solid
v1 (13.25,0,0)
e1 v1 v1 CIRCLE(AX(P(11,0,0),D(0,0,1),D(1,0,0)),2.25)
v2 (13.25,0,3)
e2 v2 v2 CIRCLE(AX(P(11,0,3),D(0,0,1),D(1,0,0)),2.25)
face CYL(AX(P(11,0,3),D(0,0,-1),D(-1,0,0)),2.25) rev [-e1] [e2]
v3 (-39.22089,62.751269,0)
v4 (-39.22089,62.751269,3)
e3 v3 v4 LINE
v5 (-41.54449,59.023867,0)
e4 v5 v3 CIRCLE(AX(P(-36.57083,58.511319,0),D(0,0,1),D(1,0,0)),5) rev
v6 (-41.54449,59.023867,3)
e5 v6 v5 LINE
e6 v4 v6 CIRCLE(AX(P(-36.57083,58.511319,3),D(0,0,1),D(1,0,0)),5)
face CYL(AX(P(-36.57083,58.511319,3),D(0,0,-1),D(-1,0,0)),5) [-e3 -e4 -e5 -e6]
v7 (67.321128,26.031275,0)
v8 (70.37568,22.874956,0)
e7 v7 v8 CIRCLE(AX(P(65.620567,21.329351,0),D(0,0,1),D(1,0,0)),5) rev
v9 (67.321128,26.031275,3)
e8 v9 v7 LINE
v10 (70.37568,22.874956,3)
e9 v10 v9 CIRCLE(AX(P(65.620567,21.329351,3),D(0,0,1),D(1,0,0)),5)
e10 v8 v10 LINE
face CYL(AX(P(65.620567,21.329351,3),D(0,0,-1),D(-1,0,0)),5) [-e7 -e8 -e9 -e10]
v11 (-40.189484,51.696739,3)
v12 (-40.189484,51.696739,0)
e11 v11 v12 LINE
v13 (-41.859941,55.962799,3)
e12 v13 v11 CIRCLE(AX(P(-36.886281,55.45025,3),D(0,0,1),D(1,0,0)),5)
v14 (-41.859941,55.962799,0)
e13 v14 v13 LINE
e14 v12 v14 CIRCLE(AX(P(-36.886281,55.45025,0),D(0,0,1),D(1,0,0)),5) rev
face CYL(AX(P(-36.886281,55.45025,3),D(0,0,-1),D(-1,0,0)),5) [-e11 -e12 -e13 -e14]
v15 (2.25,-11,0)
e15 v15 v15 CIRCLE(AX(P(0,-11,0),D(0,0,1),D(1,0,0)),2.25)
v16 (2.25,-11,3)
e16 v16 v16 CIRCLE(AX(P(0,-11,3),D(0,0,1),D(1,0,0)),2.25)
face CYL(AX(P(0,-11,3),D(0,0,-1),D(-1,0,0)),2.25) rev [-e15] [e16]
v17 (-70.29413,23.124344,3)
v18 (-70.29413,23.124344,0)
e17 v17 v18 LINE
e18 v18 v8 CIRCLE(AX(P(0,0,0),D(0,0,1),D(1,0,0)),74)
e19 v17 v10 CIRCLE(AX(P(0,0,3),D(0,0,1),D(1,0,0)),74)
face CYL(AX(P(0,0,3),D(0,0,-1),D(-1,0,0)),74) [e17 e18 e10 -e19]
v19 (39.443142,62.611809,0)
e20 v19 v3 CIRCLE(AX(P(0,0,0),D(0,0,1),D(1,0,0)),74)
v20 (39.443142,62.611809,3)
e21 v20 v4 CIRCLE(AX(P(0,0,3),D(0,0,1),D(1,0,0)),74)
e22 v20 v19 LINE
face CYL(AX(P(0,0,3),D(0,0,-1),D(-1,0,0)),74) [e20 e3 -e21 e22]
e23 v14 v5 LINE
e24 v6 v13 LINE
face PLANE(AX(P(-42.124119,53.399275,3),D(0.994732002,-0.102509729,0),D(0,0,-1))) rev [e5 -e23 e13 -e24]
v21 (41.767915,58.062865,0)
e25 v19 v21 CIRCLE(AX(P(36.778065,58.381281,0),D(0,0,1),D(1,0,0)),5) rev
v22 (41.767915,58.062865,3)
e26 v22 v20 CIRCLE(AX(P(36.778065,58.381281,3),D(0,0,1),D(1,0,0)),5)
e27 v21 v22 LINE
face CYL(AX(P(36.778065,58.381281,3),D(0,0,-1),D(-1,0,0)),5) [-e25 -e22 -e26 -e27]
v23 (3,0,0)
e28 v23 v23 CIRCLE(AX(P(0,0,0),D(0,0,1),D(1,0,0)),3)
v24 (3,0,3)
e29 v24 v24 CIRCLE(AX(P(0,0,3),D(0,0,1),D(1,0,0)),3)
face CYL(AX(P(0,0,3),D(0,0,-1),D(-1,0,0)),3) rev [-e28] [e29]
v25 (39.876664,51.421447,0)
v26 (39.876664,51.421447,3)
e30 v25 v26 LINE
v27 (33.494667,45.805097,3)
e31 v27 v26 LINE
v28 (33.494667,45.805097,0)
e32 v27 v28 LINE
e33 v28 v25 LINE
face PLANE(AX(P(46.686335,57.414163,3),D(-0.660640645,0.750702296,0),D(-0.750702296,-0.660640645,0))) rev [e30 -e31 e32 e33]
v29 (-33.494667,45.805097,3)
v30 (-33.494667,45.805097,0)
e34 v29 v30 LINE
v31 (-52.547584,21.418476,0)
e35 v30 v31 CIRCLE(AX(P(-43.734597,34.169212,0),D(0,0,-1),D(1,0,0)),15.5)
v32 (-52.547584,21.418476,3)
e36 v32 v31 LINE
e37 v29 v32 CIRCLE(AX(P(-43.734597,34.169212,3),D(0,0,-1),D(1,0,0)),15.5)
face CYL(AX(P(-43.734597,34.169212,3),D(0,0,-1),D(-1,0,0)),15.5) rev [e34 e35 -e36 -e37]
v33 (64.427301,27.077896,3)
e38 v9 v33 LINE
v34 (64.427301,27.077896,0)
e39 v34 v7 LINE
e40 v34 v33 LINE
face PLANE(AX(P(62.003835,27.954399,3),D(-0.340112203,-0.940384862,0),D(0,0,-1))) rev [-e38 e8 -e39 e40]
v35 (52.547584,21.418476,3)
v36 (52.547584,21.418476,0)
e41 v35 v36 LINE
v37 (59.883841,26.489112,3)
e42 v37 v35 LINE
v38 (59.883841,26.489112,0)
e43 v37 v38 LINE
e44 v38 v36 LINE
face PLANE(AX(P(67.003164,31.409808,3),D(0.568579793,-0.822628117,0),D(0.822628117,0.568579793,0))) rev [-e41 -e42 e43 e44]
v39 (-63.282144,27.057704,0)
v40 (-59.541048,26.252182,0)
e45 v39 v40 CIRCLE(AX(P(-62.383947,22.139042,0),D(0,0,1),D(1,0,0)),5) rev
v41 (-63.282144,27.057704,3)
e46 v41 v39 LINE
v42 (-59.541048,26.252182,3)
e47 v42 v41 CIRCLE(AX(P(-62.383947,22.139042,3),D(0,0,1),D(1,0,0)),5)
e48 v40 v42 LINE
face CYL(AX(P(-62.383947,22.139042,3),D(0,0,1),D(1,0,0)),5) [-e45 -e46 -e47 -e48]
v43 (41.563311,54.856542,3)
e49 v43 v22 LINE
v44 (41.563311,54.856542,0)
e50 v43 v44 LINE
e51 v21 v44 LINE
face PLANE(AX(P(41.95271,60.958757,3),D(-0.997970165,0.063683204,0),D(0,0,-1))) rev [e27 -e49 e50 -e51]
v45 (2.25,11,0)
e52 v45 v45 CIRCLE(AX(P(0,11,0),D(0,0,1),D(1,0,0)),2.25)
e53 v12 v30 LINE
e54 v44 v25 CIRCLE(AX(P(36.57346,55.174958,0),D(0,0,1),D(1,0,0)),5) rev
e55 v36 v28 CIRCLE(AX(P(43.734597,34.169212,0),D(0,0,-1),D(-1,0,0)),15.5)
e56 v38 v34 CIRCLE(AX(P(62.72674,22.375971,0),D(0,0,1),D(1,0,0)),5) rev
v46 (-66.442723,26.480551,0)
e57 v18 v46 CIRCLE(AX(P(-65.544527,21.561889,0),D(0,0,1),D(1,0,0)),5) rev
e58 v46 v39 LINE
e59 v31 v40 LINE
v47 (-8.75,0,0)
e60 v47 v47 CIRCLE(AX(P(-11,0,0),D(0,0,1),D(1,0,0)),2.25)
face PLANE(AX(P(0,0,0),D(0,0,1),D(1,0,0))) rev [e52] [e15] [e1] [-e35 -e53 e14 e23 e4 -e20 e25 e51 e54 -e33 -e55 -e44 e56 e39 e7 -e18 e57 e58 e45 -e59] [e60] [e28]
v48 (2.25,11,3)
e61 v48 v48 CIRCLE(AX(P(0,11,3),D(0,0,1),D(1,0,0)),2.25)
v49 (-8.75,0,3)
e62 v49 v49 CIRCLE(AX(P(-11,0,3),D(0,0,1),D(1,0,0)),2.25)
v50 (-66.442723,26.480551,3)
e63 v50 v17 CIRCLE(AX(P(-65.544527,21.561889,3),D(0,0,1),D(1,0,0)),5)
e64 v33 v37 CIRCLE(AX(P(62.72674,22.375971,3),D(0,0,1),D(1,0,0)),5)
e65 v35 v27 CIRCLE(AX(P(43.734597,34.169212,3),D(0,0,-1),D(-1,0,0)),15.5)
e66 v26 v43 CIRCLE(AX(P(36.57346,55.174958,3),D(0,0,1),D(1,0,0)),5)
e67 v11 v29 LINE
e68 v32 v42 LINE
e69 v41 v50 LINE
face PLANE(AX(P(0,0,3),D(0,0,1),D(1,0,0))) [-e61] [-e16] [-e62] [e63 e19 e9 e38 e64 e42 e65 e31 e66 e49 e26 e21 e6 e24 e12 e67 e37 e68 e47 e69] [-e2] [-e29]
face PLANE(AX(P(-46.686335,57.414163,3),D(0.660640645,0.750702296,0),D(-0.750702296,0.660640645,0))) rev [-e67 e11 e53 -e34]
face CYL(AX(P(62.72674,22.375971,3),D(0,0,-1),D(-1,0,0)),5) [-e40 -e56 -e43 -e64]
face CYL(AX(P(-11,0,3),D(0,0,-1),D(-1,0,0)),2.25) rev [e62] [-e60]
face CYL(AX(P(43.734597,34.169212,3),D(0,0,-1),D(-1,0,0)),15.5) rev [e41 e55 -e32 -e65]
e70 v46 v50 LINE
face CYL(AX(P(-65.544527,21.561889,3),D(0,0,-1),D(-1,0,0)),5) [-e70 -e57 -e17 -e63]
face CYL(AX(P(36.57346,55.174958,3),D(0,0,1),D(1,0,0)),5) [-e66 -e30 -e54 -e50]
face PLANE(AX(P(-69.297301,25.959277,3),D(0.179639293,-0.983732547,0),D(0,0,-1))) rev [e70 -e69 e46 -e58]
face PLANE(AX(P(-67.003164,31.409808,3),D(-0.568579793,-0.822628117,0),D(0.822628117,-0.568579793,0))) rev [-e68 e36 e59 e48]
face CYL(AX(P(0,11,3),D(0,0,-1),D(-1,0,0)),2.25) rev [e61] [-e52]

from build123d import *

# Parameters (mm, degrees)
ESQUISSE1_R        = 2.25
ESQUISSE1_R_2      = 3
BOSS_EXTRU_1_DEPTH = 3
CHANFREIN1_SIZE    = 7
CHANFREIN1_SIZE_2  = 6.077264162
CONG_2_R           = 5


with BuildPart() as part:
    # Esquisse1 → Boss.-Extru.1 (new body)
    with BuildSketch(Plane.XY):
        with BuildLine():
            Line((67.003163723, 31.409808199), (52.547583613, 21.418476063))
            ThreePointArc((52.547583613, 21.418476063), (31.520430144, 24.626459013), (33.494666824, 45.805097476))
            Line((33.494666824, 45.805097476), (46.686335037, 57.414163068))
            ThreePointArc((46.686335037, 57.414163068), (0, 74), (-46.686335037, 57.414163068))
            Line((-46.686335037, 57.414163068), (-33.494666824, 45.805097476))
            ThreePointArc((-33.494666824, 45.805097476), (-31.520430144, 24.626459013), (-52.547583613, 21.418476063))
            Line((-52.547583613, 21.418476063), (-67.003163723, 31.409808199))
            ThreePointArc((-67.003163723, 31.409808199), (0, -74), (67.003163723, 31.409808199))
        make_face()
        with Locations((0, 11)):
            Circle(ESQUISSE1_R, mode=Mode.SUBTRACT)
        with Locations((11, 0)):
            Circle(ESQUISSE1_R, mode=Mode.SUBTRACT)
        with Locations((0, -11)):
            Circle(ESQUISSE1_R, mode=Mode.SUBTRACT)
        with Locations((-11, 0)):
            Circle(ESQUISSE1_R, mode=Mode.SUBTRACT)
        Circle(ESQUISSE1_R_2, mode=Mode.SUBTRACT)
    extrude(amount=BOSS_EXTRU_1_DEPTH)

    # Chanfrein1
    # the kernel refuses this chamfer: 7, 6.077264162 mm, written as the material it takes off along each edge
    with BuildSketch(Plane(origin=(-67.003163723, 31.409808199, -18.001780916), x_dir=(0.8226281172410916, -0.5685797927506542, 0), z_dir=(0, 0, 1)), Plane(origin=(46.686335037, 57.414163068, -18.001780916), x_dir=(-0.7507022964494048, -0.660640645211593, 0), z_dir=(0, 0, 1))) as chanfrein1_piece_1:
        with BuildLine():
            Line((CHANFREIN1_SIZE, 0), (1.211839928, -5.788160072))
            ThreePointArc((1.211839928, -5.788160072), (0.563802351, -2.981105416), (0, 0))
            Line((0, 0), (CHANFREIN1_SIZE, 0))
        make_face()
    extrude(amount=39.003561832, mode=Mode.SUBTRACT)
    with BuildSketch(Plane(origin=(-46.686335037, 57.414163068, -17.23797929), x_dir=(0.8036456523944729, 0.5951081123522532, 0), z_dir=(0, 0, 1))) as chanfrein1_piece_2:
        with BuildLine():
            Line((6.703271947, 0), (CHANFREIN1_SIZE_2 * 0.210146029479, -CHANFREIN1_SIZE_2 * 0.977670008946))
            Line((CHANFREIN1_SIZE_2 * 0.210146029479, -CHANFREIN1_SIZE_2 * 0.977670008946), (0, 0))
            ThreePointArc((0, 0), (3.446010548, 0.075880568), (6.703271947, 0))
        make_face()
    extrude(amount=37.475958581, mode=Mode.SUBTRACT)
    with BuildSketch(Plane(origin=(67.003163723, 31.409808199, -17.23797929), x_dir=(-0.8226281172410943, -0.5685797927506503, 0), z_dir=(0, 0, 1))) as chanfrein1_piece_3:
        with BuildLine():
            Line((CHANFREIN1_SIZE_2, 0), (1.408665984, 6.553587944))
            ThreePointArc((1.408665984, 6.553587944), (0.649979278, 3.385007163), (0, 0))
            Line((0, 0), (CHANFREIN1_SIZE_2, 0))
        make_face()
    extrude(amount=37.475958581, mode=Mode.SUBTRACT)

    # Congé2
    cong_2_edges = [part.edges().sort_by_distance(p)[0] for p in [
        (62.003835348, 27.954398601, 1.5),
        (-69.297300979, 25.959277281, 1.5),
        (69.570593152, 25.217703474, 1.5),
        (-41.29927968, 61.403334583, 1.5),
        (41.952710216, 60.958757415, 1.5),
        (41.431418962, 52.789678551, 1.5),
        (-42.124118875, 53.39927535, 1.5),
        (-61.244766903, 27.429749649, 1.5),
    ]]
    fillet(cong_2_edges, radius=CONG_2_R)


solid = part.part
